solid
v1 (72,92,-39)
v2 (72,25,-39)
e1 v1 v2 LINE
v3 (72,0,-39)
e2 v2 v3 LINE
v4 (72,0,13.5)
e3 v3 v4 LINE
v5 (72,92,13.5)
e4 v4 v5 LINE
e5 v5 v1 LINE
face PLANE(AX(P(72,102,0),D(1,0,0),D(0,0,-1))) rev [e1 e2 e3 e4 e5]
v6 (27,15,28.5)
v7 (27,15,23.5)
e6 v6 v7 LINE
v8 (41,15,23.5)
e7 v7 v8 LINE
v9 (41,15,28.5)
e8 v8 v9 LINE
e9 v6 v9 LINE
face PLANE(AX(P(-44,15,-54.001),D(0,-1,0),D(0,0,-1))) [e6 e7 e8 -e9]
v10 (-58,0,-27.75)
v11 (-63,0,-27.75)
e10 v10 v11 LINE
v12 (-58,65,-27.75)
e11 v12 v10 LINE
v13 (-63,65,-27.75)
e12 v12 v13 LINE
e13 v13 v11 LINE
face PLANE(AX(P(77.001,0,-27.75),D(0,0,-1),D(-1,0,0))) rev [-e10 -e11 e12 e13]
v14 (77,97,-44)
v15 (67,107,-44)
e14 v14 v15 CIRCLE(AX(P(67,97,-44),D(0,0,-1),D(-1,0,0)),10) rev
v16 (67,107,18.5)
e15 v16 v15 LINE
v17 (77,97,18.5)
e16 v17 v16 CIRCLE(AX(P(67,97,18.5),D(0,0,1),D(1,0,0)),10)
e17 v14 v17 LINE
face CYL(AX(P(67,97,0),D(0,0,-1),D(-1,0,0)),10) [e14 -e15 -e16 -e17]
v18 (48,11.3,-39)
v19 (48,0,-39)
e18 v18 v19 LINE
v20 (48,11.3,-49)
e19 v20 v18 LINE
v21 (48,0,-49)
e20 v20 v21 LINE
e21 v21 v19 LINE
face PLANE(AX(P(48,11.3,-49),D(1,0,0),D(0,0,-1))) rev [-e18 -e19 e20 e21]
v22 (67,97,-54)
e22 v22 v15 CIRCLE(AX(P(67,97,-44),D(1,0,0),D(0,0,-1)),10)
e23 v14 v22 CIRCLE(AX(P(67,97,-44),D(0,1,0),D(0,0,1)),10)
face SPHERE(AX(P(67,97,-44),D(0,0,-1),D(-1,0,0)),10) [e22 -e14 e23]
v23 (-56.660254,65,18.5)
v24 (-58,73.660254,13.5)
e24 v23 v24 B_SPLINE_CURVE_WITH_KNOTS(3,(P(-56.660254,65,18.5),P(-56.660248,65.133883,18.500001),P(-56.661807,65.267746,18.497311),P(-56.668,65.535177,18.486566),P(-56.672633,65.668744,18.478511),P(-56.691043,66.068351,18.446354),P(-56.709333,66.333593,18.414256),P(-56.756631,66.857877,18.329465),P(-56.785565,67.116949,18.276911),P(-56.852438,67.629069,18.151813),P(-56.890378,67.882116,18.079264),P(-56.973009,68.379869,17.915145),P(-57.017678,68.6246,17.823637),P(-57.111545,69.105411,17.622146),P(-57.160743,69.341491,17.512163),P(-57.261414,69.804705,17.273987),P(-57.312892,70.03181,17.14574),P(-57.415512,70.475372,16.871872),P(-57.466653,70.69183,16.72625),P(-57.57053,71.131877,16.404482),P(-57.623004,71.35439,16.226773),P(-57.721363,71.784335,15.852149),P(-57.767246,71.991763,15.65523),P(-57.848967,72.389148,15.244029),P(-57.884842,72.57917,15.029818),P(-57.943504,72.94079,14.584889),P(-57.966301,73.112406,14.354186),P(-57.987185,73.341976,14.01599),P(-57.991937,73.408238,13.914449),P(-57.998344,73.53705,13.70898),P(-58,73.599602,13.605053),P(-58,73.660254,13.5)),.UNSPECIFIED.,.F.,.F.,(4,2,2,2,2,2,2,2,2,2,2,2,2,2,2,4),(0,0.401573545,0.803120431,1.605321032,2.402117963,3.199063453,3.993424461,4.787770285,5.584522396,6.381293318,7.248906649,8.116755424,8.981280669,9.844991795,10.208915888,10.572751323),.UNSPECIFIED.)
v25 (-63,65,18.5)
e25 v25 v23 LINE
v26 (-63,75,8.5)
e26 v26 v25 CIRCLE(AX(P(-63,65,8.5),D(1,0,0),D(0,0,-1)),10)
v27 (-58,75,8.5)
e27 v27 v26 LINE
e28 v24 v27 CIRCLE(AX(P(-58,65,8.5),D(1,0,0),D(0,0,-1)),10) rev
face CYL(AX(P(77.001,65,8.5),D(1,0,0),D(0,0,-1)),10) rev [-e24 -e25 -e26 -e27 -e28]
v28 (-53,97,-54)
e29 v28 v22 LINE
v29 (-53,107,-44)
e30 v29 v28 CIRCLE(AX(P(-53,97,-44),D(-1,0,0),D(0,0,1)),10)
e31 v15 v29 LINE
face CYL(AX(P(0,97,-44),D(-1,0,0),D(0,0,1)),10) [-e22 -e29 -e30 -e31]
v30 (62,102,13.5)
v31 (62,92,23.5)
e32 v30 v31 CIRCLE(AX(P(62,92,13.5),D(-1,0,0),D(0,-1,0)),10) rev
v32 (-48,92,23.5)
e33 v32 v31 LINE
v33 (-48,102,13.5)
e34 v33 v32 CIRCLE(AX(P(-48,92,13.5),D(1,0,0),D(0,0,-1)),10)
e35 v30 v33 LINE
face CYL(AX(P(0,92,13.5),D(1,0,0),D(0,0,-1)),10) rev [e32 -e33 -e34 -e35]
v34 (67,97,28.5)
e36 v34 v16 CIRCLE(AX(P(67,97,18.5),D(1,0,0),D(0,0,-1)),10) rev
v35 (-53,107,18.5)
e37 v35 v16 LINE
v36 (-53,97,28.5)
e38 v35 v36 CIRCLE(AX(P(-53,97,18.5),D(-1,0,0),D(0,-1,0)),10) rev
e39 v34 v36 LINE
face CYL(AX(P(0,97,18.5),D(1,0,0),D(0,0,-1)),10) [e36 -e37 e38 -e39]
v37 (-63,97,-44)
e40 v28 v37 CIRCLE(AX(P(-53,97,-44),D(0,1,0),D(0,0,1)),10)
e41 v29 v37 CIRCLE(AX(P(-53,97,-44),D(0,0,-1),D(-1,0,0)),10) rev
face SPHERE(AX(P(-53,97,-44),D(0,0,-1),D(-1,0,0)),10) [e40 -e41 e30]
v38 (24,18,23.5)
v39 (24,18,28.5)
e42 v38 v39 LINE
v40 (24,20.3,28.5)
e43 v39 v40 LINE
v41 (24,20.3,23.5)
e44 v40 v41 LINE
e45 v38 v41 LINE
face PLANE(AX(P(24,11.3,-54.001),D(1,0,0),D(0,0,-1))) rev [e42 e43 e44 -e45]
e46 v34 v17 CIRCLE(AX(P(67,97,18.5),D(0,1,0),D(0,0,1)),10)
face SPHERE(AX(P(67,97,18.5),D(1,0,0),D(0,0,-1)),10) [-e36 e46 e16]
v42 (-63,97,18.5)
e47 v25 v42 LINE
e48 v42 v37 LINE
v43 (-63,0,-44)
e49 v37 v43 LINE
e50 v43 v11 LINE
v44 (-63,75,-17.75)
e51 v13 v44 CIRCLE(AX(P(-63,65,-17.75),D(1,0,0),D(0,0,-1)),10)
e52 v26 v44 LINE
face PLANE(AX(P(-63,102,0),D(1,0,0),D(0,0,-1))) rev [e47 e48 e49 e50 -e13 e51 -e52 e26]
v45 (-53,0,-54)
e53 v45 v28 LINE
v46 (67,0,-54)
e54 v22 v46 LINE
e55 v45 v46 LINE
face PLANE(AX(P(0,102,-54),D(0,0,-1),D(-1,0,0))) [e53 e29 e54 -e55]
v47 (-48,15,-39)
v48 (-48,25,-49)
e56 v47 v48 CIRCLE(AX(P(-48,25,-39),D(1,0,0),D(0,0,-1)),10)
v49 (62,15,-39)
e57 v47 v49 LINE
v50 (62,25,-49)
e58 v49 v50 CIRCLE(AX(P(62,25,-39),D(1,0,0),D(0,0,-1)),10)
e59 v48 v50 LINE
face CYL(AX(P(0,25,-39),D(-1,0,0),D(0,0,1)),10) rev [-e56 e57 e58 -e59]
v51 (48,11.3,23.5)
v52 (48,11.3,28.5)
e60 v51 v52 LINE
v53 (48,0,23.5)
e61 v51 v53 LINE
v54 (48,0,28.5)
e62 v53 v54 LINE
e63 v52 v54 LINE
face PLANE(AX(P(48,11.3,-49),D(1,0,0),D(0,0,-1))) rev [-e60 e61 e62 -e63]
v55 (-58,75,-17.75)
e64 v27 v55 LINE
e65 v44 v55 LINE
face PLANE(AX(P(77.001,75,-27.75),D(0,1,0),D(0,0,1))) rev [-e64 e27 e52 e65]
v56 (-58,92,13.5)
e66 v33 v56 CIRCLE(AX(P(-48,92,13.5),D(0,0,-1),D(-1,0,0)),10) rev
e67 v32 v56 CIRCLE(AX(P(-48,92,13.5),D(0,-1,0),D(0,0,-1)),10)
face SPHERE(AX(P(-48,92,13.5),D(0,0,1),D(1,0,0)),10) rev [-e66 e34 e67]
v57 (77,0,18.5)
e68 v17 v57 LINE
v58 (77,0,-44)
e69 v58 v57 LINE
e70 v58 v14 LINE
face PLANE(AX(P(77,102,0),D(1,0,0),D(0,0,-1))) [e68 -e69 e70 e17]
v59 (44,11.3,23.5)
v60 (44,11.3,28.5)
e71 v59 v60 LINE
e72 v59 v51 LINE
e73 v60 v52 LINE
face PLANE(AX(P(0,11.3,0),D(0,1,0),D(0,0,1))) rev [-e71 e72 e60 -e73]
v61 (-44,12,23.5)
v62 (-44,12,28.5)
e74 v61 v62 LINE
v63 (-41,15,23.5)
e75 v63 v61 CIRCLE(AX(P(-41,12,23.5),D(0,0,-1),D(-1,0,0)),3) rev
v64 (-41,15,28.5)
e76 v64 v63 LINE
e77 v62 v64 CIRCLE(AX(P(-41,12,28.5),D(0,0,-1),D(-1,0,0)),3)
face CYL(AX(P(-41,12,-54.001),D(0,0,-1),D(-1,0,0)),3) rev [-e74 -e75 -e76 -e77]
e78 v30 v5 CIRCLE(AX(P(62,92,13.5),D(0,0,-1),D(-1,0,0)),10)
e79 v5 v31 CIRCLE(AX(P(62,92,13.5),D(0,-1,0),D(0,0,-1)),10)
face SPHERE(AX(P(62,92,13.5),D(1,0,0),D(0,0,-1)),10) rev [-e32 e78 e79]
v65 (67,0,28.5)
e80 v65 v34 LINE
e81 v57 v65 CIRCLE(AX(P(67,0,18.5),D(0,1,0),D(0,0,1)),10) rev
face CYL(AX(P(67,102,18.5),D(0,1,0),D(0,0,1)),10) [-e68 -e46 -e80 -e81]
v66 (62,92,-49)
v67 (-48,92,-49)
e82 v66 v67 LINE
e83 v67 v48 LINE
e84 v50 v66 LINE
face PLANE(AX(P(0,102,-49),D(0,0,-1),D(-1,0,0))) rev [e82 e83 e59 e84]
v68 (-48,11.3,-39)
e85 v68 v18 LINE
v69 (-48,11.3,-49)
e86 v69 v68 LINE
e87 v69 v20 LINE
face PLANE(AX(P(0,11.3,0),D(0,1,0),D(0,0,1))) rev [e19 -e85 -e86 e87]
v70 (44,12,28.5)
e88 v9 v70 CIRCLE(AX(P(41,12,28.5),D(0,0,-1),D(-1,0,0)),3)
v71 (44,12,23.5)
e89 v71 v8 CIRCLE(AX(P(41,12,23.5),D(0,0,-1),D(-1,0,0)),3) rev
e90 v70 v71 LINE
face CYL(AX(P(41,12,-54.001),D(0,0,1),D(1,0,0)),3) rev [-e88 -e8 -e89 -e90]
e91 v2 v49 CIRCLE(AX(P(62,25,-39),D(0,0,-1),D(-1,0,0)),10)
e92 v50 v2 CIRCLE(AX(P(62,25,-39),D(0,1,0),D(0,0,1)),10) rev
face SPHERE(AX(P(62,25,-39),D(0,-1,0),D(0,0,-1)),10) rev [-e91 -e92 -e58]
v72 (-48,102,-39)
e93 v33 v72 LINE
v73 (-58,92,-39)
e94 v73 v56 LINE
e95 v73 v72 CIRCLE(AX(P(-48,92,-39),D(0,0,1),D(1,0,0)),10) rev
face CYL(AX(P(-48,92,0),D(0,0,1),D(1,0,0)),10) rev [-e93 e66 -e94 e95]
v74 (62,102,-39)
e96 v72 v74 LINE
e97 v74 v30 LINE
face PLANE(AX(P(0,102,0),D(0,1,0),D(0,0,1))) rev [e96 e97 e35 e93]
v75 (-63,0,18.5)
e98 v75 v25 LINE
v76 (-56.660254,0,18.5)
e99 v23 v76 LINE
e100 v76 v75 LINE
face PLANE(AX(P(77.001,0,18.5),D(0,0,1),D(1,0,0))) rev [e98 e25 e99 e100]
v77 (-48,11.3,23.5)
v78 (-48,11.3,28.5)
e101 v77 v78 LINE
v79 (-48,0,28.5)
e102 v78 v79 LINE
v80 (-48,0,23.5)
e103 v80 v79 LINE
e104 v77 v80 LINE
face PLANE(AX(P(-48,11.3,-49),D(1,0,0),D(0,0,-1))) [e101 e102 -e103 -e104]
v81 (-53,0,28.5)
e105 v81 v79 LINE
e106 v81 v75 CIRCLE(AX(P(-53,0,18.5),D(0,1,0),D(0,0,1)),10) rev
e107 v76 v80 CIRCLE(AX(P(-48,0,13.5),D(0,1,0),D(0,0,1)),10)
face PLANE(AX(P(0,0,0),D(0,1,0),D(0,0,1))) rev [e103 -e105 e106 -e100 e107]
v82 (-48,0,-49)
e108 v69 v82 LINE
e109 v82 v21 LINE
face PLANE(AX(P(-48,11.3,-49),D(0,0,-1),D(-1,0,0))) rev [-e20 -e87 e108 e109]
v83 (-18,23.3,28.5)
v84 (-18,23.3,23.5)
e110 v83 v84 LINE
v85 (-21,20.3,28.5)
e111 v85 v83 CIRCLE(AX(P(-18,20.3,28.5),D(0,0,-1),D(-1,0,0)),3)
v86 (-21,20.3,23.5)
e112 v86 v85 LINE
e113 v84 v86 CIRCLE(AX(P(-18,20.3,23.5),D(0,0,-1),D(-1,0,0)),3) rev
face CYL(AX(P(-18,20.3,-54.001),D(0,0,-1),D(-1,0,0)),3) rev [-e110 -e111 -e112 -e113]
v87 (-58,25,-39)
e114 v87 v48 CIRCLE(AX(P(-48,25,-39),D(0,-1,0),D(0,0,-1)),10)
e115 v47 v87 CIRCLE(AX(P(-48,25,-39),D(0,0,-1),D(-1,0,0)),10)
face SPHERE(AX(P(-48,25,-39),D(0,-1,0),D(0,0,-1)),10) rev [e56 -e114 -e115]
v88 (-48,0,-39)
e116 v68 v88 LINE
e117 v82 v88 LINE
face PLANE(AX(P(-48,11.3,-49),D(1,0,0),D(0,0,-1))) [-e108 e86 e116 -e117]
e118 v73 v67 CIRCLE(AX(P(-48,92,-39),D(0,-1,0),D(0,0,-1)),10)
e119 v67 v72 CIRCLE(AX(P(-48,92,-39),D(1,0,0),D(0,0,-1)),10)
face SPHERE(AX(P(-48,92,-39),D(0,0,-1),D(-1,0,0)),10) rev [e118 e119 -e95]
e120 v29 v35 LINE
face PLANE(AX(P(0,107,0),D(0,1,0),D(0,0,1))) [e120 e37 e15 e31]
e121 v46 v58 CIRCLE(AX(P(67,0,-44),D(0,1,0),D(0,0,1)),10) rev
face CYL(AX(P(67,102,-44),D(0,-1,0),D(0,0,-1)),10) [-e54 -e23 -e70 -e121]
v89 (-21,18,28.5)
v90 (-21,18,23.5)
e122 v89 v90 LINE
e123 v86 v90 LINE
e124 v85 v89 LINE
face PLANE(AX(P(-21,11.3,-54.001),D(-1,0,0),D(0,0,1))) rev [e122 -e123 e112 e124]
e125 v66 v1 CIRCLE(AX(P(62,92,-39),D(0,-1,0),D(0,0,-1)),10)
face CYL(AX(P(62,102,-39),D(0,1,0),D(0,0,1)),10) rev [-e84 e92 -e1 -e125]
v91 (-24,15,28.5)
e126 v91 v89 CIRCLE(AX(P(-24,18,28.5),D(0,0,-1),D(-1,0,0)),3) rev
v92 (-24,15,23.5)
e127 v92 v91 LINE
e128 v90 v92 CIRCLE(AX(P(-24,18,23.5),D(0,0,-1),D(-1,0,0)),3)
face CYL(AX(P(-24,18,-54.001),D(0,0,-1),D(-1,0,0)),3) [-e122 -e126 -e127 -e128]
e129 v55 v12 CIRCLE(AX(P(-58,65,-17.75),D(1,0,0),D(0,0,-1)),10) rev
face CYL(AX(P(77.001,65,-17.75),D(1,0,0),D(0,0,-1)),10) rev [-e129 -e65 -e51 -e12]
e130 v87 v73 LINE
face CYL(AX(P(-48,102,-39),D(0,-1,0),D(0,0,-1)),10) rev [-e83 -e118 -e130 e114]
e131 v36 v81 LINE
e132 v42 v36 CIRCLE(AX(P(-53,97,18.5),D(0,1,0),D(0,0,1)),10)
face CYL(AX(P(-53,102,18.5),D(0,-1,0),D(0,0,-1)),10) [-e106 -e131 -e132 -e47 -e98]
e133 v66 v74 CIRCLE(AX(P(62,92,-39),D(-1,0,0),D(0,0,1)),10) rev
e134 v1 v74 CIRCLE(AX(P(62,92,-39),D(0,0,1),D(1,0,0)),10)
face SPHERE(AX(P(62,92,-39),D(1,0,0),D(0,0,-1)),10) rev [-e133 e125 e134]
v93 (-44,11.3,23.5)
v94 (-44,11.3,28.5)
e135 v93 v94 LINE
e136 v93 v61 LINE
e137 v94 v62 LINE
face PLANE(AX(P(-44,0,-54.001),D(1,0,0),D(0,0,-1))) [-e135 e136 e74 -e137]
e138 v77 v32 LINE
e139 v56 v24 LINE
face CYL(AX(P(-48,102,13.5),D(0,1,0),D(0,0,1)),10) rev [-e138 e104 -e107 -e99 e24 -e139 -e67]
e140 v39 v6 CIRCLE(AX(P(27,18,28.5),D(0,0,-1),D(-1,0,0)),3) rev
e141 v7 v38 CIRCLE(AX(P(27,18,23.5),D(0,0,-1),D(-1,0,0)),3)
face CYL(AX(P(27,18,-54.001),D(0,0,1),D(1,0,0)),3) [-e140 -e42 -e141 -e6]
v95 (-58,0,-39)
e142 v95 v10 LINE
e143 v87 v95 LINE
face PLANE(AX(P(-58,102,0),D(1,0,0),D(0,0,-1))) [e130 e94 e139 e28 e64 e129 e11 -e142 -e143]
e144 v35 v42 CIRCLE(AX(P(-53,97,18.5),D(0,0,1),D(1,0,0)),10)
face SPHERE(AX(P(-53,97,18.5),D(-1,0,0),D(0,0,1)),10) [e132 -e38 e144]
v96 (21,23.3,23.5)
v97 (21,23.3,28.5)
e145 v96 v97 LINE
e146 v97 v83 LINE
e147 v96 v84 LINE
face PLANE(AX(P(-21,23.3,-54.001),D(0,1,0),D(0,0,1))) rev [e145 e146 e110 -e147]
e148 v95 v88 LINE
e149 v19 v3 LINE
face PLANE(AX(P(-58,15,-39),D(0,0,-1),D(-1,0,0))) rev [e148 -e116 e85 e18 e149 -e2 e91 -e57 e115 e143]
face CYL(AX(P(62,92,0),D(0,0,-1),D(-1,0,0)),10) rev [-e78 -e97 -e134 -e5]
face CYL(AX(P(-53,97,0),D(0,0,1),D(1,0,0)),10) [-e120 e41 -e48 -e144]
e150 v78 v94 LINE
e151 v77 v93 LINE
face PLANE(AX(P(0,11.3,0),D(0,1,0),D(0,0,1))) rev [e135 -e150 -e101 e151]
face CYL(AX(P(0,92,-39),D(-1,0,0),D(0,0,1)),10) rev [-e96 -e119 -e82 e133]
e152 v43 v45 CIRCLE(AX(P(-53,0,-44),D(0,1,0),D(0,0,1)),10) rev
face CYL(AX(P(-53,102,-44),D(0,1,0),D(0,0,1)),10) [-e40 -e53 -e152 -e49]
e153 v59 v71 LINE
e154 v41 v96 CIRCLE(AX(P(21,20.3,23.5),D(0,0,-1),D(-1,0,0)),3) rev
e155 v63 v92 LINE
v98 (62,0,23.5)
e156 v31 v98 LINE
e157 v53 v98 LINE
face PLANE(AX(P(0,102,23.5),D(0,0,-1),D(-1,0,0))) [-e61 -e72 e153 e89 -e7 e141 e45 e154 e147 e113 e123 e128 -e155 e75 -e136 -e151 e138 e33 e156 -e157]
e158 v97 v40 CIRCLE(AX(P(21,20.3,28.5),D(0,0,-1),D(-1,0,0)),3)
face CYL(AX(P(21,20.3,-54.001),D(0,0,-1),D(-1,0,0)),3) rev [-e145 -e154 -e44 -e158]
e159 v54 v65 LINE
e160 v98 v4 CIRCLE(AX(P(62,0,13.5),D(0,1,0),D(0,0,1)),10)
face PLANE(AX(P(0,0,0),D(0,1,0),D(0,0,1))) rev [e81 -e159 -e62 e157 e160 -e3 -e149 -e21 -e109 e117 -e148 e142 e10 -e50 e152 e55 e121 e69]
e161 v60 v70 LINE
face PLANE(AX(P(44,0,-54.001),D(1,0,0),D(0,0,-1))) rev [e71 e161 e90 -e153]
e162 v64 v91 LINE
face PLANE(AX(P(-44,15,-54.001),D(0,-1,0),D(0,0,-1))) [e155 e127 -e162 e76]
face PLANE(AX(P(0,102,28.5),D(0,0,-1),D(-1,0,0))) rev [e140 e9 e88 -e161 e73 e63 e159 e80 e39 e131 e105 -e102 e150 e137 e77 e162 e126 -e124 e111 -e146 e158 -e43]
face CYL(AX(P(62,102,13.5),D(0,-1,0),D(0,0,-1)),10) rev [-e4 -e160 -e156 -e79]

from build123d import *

# Parameters (mm, degrees)
SKETCH1_W           = 140
SKETCH1_H           = 82.5
SKETCH1_W_2         = 130
SKETCH1_H_2         = 72.5
BOSS_EXTRUDE1_DEPTH = 102
BOSS_EXTRUDE2_START = 102
SKETCH1_3_W         = 140
SKETCH1_3_H         = 82.5
BOSS_EXTRUDE2_DEPTH = 5
SKETCH1_4_W         = 96
SKETCH1_4_H         = 82.405729741
BOSS_EXTRUDE4_DEPTH = 11.3
SKETCH1_5_W         = 130
SKETCH1_5_H         = 10
EXTRUDE_THIN3_DEPTH = 15
CUT_EXTRUDE2_REACH  = 157.513
SKETCH2_W           = 88
SKETCH2_H           = 15
FILLET1_R           = 10
FILLET2_R           = 10
CUT_EXTRUDE3_REACH  = 186.296
SKETCH3_W           = 46.25
SKETCH3_H           = 75
FILLET3_R           = 10
CUT_EXTRUDE4_REACH  = 157.513
SKETCH4_W           = 45
SKETCH4_H           = 12
FILLET4_R           = 3


with BuildPart() as part:
    # Sketch1 → Boss-Extrude1 (new body)
    with BuildSketch(Plane(origin=(0, 0, 0), x_dir=(1, 0, 0), z_dir=(0, 1, 0))):
        with Locations((7, 12.75)):
            Rectangle(SKETCH1_W, SKETCH1_H)
        with Locations((7, 12.75)):
            Rectangle(SKETCH1_W_2, SKETCH1_H_2, mode=Mode.SUBTRACT)
    extrude(amount=BOSS_EXTRUDE1_DEPTH)

    # Sketch1<3> → Boss-Extrude2 (add)
    with BuildSketch(Plane(origin=(0, 0, 0), x_dir=(1, 0, 0), z_dir=(0, 1, 0)).offset(BOSS_EXTRUDE2_START)):
        with Locations((7, 12.75)):
            Rectangle(SKETCH1_3_W, SKETCH1_3_H)
    extrude(amount=BOSS_EXTRUDE2_DEPTH)

    # Sketch1<5> → Extrude-Thin3 (add)
    with BuildSketch(Plane(origin=(0, 0, 0), x_dir=(1, 0, 0), z_dir=(0, 1, 0))):
        with Locations((7, 44)):
            Rectangle(SKETCH1_5_W, SKETCH1_5_H)
    extrude(amount=EXTRUDE_THIN3_DEPTH)


with BuildPart() as body_2:
    # Sketch1<4> → Boss-Extrude4 (new body)
    with BuildSketch(Plane(origin=(0, 0, 0), x_dir=(1, 0, 0), z_dir=(0, 1, 0))):
        with Locations((0, 7.797135129)):
            Rectangle(SKETCH1_4_W, SKETCH1_4_H)
    extrude(amount=BOSS_EXTRUDE4_DEPTH)


with BuildPart() as part_1:
    add(part.part)

    # Combine1: cut body 2
    add(body_2.part, mode=Mode.SUBTRACT)

    # Sketch2 → Cut-Extrude2 (cut, up to next)
    with BuildSketch(Plane.XY.offset(28.5), mode=Mode.PRIVATE) as cut_extrude2_sk1:
        with Locations((0, 7.5)):
            Rectangle(SKETCH2_W, SKETCH2_H)
    cut_extrude2_tool1 = extrude(cut_extrude2_sk1.sketch, amount=-CUT_EXTRUDE2_REACH, mode=Mode.PRIVATE) & part_1.part
    add(cut_extrude2_tool1.solids().sort_by_distance((0, 7.5, 28.5))[0], mode=Mode.SUBTRACT)

    # Fillet1
    fillet1_edges = [part_1.edges().sort_by_distance(p)[0] for p in [
        (-58, 102, -12.75),
        (7, 102, 23.5),
        (72, 102, -12.75),
        (7, 102, -49),
        (7, 107, 28.5),
        (-63, 107, -12.75),
        (7, 107, -54),
        (77, 107, -12.75),
        (-58, 58.5, -49),
        (72, 58.5, -49),
        (72, 51, 23.5),
        (-58, 51, 23.5),
        (-63, 53.5, 28.5),
        (-63, 53.5, -54),
        (77, 53.5, -54),
        (77, 53.5, 28.5),
    ]]
    fillet(fillet1_edges, radius=FILLET1_R)

    # Fillet2
    fillet2_edges = [part_1.edges().sort_by_distance(p)[0] for p in [
        (7, 15, -49),
        (69.071067812, 15, -46.071067812),
        (-55.071067812, 15, -46.071067812),
    ]]
    fillet(fillet2_edges, radius=FILLET2_R - 0.0001)  # a hair under: the kernel refuses the full size

    # Sketch3 → Cut-Extrude3 (cut, up to next)
    with BuildSketch(Plane.ZY.offset(63), mode=Mode.PRIVATE) as cut_extrude3_sk1:
        with Locations((-4.625, 37.5)):
            Rectangle(SKETCH3_W, SKETCH3_H)
    cut_extrude3_tool1 = extrude(cut_extrude3_sk1.sketch, amount=-CUT_EXTRUDE3_REACH, mode=Mode.PRIVATE) & part_1.part
    add(cut_extrude3_tool1.solids().sort_by_distance((-63, 37.5, -4.625))[0], mode=Mode.SUBTRACT)

    # Fillet3
    fillet3_edges = [part_1.edges().sort_by_distance(p)[0] for p in [
        (-59.830127019, 75, 18.5),
        (-60.5, 75, -27.75),
    ]]
    fillet(fillet3_edges, radius=FILLET3_R)

    # Sketch4 → Cut-Extrude4 (cut, up to next)
    with BuildSketch(Plane.XY.offset(28.5), mode=Mode.PRIVATE) as cut_extrude4_sk1:
        with Locations((1.5, 17.3)):
            Rectangle(SKETCH4_W, SKETCH4_H)
    cut_extrude4_tool1 = extrude(cut_extrude4_sk1.sketch, amount=-CUT_EXTRUDE4_REACH, mode=Mode.PRIVATE) & part_1.part
    add(cut_extrude4_tool1.solids().sort_by_distance((1.5, 17.3, 28.5))[0], mode=Mode.SUBTRACT)

    # Fillet4
    fillet4_edges = [part_1.edges().sort_by_distance(p)[0] for p in [
        (44, 15, 26),
        (-44, 15, 26),
        (24, 15, 26),
        (24, 23.3, 26),
        (-21, 23.3, 26),
        (-21, 15, 26),
    ]]
    fillet(fillet4_edges, radius=FILLET4_R)


solid = part_1.part
